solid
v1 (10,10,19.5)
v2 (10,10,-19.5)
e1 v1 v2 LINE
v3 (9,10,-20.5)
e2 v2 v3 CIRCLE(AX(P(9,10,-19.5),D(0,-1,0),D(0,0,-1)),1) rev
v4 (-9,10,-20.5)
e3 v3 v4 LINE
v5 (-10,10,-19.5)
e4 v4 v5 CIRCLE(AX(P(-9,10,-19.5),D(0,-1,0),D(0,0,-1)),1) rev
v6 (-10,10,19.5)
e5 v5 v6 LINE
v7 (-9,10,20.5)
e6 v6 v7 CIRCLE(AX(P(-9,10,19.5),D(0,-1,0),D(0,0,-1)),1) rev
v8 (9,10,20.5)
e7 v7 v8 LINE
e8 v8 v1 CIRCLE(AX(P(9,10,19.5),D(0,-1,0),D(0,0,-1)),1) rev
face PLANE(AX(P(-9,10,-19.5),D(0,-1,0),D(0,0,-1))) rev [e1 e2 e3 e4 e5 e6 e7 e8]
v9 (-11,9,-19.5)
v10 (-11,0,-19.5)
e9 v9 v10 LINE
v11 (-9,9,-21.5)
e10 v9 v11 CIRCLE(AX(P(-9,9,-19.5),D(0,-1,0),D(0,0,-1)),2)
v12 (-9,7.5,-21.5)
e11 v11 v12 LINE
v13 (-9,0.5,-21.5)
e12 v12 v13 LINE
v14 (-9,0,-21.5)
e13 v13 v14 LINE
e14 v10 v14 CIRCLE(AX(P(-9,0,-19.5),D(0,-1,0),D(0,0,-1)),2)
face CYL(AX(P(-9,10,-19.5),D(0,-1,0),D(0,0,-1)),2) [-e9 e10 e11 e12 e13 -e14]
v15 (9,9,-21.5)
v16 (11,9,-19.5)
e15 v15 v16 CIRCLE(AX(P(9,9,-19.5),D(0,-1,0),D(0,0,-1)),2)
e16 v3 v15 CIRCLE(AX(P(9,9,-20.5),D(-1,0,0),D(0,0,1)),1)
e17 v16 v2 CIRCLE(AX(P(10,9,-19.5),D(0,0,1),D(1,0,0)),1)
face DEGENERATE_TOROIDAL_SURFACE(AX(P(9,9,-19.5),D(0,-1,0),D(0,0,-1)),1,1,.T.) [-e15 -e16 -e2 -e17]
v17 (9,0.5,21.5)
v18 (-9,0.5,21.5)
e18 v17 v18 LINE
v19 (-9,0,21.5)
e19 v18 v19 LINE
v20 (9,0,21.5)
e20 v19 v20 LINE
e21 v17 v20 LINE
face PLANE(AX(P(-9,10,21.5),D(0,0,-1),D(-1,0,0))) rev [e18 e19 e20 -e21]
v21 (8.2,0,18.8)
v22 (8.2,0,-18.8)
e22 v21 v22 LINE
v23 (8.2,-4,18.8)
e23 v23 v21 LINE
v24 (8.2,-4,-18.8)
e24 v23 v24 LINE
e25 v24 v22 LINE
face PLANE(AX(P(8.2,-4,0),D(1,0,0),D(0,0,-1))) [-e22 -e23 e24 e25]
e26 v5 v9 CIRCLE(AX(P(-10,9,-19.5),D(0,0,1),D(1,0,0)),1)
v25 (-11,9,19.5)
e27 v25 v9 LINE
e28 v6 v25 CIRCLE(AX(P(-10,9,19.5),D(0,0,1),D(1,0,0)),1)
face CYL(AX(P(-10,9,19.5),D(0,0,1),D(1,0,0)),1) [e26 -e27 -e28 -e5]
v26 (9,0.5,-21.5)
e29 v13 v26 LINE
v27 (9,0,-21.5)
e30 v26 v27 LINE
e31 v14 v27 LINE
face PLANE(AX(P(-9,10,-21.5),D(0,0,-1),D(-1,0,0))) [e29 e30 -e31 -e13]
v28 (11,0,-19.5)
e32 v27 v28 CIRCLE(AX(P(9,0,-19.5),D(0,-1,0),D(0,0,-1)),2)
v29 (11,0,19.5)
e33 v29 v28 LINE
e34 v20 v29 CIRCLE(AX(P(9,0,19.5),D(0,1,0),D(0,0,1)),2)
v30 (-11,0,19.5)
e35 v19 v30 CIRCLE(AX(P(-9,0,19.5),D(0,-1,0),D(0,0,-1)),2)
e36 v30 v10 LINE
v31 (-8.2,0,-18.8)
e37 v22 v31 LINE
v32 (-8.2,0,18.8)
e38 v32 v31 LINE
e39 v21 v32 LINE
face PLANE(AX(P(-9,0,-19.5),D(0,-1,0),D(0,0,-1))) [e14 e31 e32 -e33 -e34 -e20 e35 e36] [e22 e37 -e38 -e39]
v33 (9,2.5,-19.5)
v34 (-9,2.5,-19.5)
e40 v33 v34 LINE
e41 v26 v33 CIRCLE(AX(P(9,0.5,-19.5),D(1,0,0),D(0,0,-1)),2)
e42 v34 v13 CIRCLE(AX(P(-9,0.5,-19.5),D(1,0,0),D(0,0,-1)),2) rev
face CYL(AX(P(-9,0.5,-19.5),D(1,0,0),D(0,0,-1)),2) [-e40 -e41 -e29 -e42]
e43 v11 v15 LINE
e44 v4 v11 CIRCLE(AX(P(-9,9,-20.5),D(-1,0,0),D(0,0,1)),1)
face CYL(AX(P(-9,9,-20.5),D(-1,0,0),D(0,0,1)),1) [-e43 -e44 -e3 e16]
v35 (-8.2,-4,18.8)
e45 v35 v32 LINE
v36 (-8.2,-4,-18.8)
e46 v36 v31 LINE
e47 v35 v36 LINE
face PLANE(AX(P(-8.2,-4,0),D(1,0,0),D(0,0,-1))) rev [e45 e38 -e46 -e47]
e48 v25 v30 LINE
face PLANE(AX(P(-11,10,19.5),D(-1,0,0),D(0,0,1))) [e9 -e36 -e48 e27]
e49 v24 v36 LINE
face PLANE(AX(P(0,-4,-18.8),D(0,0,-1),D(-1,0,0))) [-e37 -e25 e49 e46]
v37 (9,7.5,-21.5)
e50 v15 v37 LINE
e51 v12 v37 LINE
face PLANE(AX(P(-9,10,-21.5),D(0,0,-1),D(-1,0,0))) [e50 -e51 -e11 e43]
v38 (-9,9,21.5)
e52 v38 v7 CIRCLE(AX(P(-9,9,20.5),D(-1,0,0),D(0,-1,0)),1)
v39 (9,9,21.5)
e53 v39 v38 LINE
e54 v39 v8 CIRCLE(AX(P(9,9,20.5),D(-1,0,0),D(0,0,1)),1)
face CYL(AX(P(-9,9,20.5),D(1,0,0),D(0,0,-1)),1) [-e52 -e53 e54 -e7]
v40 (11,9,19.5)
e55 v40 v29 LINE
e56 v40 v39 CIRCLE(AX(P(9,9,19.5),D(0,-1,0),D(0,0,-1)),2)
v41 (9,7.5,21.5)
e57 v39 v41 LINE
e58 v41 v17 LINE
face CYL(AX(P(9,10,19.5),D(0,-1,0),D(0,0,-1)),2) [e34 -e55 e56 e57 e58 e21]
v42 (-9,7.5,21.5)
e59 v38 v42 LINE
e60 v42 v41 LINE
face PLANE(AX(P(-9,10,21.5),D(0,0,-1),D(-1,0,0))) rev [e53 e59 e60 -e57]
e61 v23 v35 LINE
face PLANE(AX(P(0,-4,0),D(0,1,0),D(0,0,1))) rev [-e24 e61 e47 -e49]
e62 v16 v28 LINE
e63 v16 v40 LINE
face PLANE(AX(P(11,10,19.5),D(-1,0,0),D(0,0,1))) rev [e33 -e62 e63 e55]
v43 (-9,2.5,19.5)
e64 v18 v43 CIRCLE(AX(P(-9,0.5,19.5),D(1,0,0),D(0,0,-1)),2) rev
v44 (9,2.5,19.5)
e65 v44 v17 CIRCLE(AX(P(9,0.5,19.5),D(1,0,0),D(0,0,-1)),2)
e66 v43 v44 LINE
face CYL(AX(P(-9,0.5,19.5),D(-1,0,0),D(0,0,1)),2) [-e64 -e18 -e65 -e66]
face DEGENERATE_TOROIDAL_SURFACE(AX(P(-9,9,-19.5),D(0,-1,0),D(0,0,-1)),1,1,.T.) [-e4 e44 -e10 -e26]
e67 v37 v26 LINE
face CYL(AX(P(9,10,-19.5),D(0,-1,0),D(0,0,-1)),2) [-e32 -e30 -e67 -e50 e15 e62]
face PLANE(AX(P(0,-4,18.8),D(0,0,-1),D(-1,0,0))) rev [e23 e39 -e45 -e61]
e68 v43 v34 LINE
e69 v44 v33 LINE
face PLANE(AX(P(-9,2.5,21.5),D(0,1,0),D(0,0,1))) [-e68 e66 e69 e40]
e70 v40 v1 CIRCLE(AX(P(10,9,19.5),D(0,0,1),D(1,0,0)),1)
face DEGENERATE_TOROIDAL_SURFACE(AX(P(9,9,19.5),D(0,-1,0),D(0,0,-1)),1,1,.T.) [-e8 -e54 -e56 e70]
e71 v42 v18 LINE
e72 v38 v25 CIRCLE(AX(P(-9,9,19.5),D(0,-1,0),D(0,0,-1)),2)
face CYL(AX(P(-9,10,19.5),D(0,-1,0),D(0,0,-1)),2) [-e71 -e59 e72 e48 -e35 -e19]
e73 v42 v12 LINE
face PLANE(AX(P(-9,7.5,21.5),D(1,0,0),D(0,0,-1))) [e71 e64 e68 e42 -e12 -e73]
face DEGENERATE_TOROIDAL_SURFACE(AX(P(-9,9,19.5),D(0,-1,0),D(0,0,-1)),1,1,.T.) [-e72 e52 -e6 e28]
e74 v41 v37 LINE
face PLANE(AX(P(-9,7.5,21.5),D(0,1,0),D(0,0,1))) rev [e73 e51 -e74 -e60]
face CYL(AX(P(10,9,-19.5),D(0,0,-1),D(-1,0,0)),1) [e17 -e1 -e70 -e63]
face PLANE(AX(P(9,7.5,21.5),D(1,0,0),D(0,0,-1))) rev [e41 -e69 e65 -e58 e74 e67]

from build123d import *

# Parameters (mm, degrees)
BOSS_EXTRUDE1_DEPTH = 10
SKETCH1_4_W         = 16.4
SKETCH1_4_H         = 37.6
BOSS_EXTRUDE2_DEPTH = 4
SKETCH3_W           = 18
SKETCH3_H           = 5
CUT_EXTRUDE2_DEPTH  = 70.74955197
FILLET2_R           = 1
FILLET3_R           = 2


with BuildPart() as part:
    # Sketch1 → Boss-Extrude1 (new body)
    with BuildSketch(Plane(origin=(0, 0, 0), x_dir=(1, 0, 0), z_dir=(0, 1, 0))):
        with BuildLine():
            Line((-9, -21.5), (9, -21.5))
            ThreePointArc((9, -21.5), (10.414213562, -20.914213562), (11, -19.5))
            Line((11, -19.5), (11, 19.5))
            ThreePointArc((11, 19.5), (10.414213562, 20.914213562), (9, 21.5))
            Line((9, 21.5), (-9, 21.5))
            ThreePointArc((-9, 21.5), (-10.414213562, 20.914213562), (-11, 19.5))
            Line((-11, 19.5), (-11, -19.5))
            ThreePointArc((-11, -19.5), (-10.414213562, -20.914213562), (-9, -21.5))
        make_face()
    extrude(amount=BOSS_EXTRUDE1_DEPTH)

    # Sketch1<4> → Boss-Extrude2 (add)
    with BuildSketch(Plane(origin=(0, 0, 0), x_dir=(1, 0, 0), z_dir=(0, 1, 0))):
        Rectangle(SKETCH1_4_W, SKETCH1_4_H)
    extrude(amount=-BOSS_EXTRUDE2_DEPTH)

    # Sketch3 → Cut-Extrude2 (cut, through all)
    with BuildSketch(Plane(origin=(-43, 0, -21.5), x_dir=(1, 0, 0), z_dir=(0, 0, 1))):
        with Locations((43, 5)):
            Rectangle(SKETCH3_W, SKETCH3_H)
    extrude(amount=CUT_EXTRUDE2_DEPTH, mode=Mode.SUBTRACT)

    # Fillet2
    fillet2_edges = [part.edges().sort_by_distance(p)[0] for p in [
        (10.414213562, 10, -20.914213562),
        (11, 10, 0),
        (10.414213562, 10, 20.914213562),
        (0, 10, 21.5),
        (-10.414213562, 10, 20.914213562),
        (-11, 10, 0),
        (-10.414213562, 10, -20.914213562),
        (0, 10, -21.5),
    ]]
    fillet(fillet2_edges, radius=FILLET2_R)

    # Fillet3
    # the kernel refuses this fillet: 2 mm, written as the material it takes off along each edge
    with BuildSketch(Plane(origin=(9, 2.5, -21.5), x_dir=(0, -1, 0), z_dir=(-1, 0, 0))) as fillet3_piece_1:
        with BuildLine():
            CenterArc((FILLET3_R, FILLET3_R), FILLET3_R, 180, 90)
            Line((0, FILLET3_R), (0, 0))
            Line((0, 0), (FILLET3_R, 0))
        make_face()
    extrude(amount=18, mode=Mode.SUBTRACT)
    with BuildSketch(Plane(origin=(9, 2.5, 21.5), x_dir=(0, -1, 0), z_dir=(-1, 0, 0))) as fillet3_piece_2:
        with BuildLine():
            CenterArc((FILLET3_R, -FILLET3_R), FILLET3_R, 90, 90)
            Line((0, -FILLET3_R), (0, 0))
            Line((0, 0), (FILLET3_R, 0))
        make_face()
    extrude(amount=18, mode=Mode.SUBTRACT)


solid = part.part
